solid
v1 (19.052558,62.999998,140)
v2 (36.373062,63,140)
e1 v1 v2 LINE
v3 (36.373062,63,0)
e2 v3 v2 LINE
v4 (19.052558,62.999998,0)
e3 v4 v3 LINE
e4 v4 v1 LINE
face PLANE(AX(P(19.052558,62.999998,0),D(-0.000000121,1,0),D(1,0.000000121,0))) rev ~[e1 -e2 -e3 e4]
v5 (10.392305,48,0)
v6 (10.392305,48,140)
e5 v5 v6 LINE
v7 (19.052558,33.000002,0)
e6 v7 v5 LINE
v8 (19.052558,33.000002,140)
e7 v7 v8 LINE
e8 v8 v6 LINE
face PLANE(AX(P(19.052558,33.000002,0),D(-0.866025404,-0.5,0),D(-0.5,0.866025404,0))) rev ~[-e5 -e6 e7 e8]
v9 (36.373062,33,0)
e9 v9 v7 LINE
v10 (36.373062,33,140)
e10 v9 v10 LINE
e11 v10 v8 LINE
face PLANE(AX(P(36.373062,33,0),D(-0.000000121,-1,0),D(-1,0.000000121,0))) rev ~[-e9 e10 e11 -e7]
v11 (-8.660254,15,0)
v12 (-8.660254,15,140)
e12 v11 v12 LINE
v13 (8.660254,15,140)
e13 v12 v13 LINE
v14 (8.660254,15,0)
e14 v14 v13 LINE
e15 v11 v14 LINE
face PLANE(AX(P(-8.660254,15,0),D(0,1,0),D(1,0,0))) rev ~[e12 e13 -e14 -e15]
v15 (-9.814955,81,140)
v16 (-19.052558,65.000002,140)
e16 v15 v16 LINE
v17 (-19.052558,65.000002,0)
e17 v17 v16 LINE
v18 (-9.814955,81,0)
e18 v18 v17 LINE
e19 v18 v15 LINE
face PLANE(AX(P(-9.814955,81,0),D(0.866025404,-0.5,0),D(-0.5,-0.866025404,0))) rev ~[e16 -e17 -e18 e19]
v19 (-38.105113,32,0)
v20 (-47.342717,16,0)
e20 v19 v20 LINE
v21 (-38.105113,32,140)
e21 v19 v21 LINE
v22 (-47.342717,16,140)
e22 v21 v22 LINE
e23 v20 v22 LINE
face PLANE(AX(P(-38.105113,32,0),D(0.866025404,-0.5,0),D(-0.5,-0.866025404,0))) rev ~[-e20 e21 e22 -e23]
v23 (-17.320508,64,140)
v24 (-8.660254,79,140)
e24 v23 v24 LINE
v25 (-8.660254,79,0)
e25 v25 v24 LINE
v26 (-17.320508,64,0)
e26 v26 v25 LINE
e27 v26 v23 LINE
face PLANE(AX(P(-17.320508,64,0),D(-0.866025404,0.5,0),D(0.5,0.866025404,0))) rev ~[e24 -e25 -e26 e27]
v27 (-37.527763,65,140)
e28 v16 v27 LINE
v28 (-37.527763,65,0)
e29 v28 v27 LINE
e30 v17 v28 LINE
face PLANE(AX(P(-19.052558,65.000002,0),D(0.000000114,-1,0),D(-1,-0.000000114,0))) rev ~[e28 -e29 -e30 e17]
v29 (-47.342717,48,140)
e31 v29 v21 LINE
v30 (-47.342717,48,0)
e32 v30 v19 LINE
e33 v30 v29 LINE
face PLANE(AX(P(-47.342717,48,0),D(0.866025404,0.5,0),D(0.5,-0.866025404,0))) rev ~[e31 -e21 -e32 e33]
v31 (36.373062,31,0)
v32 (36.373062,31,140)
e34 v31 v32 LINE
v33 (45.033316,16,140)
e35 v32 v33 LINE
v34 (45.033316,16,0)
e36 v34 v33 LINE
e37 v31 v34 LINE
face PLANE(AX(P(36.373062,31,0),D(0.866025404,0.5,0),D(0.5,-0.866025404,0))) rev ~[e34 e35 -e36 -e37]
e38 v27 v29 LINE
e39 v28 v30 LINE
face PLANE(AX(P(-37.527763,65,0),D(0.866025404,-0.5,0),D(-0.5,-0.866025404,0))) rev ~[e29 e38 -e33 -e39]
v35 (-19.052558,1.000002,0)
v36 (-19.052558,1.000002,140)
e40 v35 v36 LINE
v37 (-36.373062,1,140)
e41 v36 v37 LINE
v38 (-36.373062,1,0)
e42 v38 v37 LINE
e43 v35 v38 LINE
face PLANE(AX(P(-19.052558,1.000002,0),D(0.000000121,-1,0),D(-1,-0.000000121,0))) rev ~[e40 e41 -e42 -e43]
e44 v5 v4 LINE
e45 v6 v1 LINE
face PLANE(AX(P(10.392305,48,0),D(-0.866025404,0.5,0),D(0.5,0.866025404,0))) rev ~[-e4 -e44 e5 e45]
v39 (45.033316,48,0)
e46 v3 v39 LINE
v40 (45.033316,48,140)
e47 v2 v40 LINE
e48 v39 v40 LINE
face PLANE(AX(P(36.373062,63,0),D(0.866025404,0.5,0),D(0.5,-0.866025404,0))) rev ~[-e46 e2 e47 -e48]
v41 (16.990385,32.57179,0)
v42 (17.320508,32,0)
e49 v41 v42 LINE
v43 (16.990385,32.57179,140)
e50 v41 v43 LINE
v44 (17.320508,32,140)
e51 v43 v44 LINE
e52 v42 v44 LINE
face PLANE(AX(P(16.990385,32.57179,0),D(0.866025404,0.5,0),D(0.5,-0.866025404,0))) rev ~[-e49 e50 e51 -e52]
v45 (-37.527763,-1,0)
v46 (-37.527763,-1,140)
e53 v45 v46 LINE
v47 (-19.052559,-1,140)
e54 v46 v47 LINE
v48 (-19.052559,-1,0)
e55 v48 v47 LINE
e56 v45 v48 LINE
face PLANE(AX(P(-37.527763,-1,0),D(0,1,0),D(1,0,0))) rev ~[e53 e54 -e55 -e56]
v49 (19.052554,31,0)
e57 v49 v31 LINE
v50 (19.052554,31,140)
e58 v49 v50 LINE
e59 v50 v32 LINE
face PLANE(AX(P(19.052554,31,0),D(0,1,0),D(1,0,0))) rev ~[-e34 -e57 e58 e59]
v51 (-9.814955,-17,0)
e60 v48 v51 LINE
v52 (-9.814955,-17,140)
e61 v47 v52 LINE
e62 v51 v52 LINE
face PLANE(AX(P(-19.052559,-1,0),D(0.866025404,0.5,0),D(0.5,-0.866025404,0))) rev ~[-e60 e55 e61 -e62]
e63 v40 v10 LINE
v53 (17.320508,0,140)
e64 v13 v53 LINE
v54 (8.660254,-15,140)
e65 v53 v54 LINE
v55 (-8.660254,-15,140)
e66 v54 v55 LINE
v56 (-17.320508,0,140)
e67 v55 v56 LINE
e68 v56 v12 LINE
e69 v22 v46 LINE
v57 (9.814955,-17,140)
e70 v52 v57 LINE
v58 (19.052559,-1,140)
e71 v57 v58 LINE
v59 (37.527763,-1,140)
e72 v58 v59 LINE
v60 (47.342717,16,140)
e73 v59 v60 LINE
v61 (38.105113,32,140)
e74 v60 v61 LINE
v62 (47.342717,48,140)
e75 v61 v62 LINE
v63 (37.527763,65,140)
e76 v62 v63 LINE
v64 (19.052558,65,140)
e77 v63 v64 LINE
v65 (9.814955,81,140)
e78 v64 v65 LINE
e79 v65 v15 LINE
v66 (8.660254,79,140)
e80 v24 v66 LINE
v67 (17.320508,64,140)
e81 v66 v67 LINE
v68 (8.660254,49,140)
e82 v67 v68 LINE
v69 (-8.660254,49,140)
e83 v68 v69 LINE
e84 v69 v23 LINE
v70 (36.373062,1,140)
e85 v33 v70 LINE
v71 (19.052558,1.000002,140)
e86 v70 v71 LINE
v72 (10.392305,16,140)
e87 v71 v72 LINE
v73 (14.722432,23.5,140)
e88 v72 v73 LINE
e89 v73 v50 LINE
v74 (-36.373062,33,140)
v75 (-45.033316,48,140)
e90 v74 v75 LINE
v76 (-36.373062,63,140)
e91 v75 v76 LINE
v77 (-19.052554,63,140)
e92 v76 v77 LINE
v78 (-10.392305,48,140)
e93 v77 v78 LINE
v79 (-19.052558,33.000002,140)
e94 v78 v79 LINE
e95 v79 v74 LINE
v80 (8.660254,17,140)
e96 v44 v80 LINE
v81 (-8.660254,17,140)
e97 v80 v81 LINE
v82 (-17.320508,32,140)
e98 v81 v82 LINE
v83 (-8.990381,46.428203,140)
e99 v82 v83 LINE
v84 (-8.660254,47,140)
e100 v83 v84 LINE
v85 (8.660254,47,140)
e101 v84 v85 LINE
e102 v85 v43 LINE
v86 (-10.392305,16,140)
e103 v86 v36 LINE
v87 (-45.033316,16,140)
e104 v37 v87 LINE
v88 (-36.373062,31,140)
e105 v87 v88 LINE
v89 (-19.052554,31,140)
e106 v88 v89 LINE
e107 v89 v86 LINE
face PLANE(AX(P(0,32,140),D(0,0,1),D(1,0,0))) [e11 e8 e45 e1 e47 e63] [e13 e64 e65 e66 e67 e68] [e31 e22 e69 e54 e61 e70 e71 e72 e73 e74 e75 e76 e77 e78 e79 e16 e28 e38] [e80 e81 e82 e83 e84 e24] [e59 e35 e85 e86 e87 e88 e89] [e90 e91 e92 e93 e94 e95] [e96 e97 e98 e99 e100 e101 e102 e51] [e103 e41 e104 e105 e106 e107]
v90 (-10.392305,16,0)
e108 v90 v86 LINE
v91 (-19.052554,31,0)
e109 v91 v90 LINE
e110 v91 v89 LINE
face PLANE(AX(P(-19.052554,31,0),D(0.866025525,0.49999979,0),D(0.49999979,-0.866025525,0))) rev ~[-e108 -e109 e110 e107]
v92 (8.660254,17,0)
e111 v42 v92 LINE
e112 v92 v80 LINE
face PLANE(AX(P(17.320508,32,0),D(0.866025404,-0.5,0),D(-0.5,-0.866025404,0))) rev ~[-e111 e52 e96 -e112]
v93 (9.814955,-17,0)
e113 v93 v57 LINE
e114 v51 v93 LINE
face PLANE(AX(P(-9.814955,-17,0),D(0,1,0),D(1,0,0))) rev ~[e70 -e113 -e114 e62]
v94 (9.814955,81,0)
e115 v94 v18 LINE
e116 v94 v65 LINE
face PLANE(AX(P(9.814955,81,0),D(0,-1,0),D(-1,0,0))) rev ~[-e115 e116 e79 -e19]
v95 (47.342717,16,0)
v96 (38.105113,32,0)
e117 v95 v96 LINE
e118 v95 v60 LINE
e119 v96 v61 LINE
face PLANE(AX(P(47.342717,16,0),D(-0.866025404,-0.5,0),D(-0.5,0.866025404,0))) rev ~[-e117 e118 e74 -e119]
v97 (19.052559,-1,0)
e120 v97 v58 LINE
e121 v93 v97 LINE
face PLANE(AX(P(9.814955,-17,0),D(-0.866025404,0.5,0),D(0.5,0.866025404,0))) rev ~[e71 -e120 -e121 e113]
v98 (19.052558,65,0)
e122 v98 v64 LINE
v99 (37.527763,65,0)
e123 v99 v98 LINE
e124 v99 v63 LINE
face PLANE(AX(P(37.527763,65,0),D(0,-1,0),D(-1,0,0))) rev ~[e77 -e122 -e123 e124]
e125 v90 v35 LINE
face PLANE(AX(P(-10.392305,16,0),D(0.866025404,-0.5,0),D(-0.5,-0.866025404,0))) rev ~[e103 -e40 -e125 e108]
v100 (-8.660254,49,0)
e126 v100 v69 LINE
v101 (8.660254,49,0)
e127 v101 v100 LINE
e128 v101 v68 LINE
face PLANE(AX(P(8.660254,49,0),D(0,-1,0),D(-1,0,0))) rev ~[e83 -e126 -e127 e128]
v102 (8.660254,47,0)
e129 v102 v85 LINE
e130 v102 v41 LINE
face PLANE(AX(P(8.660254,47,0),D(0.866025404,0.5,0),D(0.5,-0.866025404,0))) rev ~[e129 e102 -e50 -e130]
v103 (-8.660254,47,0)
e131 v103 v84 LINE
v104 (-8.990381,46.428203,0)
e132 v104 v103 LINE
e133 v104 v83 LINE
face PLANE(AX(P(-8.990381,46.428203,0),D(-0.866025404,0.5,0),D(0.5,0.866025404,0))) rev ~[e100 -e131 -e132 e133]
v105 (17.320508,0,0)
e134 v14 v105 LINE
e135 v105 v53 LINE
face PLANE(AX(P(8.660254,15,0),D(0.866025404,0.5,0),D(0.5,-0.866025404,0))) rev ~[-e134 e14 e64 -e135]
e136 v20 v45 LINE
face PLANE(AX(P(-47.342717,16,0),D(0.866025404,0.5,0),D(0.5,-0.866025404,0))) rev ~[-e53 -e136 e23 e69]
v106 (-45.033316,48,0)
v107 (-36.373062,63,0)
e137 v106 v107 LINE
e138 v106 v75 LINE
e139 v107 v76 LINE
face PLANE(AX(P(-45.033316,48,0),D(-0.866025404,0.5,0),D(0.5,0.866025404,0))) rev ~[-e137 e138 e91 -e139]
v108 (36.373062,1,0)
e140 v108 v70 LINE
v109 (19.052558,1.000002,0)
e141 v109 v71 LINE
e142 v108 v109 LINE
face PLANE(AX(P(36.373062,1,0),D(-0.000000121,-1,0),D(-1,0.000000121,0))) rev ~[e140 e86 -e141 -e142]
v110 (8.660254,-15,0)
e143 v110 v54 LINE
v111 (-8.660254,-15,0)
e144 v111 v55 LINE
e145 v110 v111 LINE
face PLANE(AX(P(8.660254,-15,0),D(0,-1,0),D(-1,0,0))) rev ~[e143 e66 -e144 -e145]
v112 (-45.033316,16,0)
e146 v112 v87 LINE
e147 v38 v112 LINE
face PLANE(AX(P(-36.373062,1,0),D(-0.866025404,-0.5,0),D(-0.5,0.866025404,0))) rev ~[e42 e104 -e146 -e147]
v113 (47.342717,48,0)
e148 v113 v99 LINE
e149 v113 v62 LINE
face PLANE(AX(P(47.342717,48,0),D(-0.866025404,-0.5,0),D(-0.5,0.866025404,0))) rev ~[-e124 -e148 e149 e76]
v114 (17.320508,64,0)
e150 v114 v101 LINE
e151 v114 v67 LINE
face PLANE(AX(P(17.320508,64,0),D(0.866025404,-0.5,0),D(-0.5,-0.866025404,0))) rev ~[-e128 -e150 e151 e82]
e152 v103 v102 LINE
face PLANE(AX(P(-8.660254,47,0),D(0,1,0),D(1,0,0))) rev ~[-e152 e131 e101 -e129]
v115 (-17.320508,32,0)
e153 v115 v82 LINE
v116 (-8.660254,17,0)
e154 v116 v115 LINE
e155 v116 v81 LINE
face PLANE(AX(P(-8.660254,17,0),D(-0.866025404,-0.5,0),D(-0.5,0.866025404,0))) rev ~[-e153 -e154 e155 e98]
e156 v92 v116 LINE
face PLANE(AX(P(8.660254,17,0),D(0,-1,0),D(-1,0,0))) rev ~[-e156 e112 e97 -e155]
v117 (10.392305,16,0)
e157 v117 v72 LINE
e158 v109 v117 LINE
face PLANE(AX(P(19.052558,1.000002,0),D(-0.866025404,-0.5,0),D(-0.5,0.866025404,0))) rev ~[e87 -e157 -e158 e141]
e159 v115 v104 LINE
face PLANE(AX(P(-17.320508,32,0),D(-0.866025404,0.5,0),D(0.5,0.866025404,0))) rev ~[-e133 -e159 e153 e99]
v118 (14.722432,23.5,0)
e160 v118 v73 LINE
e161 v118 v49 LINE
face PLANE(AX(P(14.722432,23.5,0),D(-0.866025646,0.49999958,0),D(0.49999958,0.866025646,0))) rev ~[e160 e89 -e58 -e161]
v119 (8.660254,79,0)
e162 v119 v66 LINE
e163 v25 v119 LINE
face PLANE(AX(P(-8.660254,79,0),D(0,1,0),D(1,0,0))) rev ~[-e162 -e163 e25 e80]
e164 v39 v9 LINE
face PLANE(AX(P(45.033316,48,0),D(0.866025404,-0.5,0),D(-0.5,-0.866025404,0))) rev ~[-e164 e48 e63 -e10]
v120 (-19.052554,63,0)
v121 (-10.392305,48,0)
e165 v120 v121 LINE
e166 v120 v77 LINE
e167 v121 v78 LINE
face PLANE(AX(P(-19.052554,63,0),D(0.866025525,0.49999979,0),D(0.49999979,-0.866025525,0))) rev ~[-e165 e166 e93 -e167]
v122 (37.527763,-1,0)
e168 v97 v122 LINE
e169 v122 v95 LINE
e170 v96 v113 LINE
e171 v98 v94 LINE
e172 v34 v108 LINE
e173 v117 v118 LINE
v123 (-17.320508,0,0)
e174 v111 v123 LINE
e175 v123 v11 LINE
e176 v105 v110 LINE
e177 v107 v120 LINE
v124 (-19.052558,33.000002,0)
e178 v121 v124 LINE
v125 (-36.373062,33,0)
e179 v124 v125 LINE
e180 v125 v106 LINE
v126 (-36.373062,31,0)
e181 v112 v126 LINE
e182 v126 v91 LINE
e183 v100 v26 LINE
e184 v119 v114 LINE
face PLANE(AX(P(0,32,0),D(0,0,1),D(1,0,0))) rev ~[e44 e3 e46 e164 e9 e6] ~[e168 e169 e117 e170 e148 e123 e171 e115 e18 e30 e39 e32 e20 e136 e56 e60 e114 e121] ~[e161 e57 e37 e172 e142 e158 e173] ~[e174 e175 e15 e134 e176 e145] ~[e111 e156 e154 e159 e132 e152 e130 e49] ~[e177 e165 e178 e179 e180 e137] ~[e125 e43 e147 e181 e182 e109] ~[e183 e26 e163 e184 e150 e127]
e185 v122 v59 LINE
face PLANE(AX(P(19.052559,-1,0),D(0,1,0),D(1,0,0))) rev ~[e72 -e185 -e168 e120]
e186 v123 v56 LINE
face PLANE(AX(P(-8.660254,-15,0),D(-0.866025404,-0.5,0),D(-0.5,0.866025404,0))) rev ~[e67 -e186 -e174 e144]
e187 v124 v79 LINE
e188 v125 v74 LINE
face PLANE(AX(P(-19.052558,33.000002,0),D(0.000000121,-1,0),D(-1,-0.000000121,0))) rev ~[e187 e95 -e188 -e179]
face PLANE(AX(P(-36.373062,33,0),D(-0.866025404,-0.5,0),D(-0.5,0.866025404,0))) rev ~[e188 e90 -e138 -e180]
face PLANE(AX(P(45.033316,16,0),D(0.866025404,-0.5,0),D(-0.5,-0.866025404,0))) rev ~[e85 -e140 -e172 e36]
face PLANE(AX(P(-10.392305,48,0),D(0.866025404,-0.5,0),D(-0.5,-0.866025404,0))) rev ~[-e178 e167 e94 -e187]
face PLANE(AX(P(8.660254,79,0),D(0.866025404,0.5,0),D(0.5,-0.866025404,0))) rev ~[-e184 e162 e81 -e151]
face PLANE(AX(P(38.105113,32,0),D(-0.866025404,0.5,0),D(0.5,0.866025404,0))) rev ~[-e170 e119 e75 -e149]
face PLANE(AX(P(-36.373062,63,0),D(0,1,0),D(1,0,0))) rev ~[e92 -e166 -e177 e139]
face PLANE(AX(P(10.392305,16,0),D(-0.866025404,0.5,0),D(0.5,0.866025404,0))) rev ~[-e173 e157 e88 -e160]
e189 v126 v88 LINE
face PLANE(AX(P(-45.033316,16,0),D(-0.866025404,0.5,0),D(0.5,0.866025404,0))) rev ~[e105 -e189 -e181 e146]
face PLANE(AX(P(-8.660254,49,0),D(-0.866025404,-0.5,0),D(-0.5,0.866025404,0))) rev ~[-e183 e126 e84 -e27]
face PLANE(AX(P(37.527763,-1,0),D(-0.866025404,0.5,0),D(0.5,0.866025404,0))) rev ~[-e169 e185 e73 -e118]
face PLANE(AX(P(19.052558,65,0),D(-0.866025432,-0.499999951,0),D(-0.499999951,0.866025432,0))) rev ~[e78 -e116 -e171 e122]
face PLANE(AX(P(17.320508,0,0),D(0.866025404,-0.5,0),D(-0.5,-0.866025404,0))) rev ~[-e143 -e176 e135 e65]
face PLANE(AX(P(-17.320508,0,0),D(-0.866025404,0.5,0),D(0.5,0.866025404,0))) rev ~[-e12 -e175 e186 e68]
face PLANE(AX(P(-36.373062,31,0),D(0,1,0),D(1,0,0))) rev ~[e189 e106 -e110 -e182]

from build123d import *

# Parameters (mm, degrees)
F1_DEPTH = 140


# Not quite as in the source:
# - ends of sketch curves that miss each other by under 0.0002 mm in the source are joined


with BuildPart() as f1:
    # F0 (on Top) → F1 (new body)
    with BuildSketch(Plane.XY):
        Polygon((9.8149545762, -17), (19.0525588833, -1), (37.5277626519, -1), (47.3427172281, 16), (38.1051129211, 32), (47.3427172281, 48), (37.5277626519, 65), (19.0525576719, 65), (9.8149545762, 81), (-9.8149545762, 81), (-19.0525576719, 65.0000020981), (-37.5277626519, 65), (-47.3427172281, 48), (-38.1051129211, 32), (-47.3427172281, 16), (-37.5277626519, -1), (-19.0525588833, -1), (-9.8149545762, -17), align=None)
        Polygon((-10.3923048454, 16), (-19.0525576719, 1.0000020981), (-36.3730621135, 1), (-45.0333161514, 16), (-36.3730621135, 31), (-19.0525540378, 31), align=None, mode=Mode.SUBTRACT)
        Polygon((-17.3205080757, 0), (-8.6602540378, 15), (8.6602540378, 15), (17.3205080757, 0), (8.6602540378, -15), (-8.6602540378, -15), align=None, mode=Mode.SUBTRACT)
        Polygon((8.6602540378, 17), (-8.6602540378, 17), (-17.3205080757, 32), (-8.9903810568, 46.4282032303), (-8.6602540378, 47), (8.6602540378, 47), (16.9903849907, 32.5717899559), (17.3205080757, 32), align=None, mode=Mode.SUBTRACT)
        Polygon((19.0525576719, 1.0000020981), (10.3923048454, 16), (14.7224318643, 23.5), (19.0525540378, 31), (36.3730621135, 31), (45.0333161514, 16), (36.3730621135, 1), align=None, mode=Mode.SUBTRACT)
        Polygon((-10.3923048454, 48), (-19.0525576719, 33.0000020981), (-36.3730621135, 33), (-45.0333161514, 48), (-36.3730621135, 63), (-19.0525540378, 63), align=None, mode=Mode.SUBTRACT)
        Polygon((19.0525576719, 33.0000020981), (10.3923048454, 48), (19.0525576719, 62.9999979019), (36.3730621135, 63), (45.0333161514, 48), (36.3730621135, 33), align=None, mode=Mode.SUBTRACT)
        Polygon((8.6602540378, 49), (-8.6602540378, 49), (-17.3205080757, 64), (-8.6602540378, 79), (8.6602540378, 79), (17.3205080757, 64), align=None, mode=Mode.SUBTRACT)
    extrude(amount=F1_DEPTH)


solid = f1.part
